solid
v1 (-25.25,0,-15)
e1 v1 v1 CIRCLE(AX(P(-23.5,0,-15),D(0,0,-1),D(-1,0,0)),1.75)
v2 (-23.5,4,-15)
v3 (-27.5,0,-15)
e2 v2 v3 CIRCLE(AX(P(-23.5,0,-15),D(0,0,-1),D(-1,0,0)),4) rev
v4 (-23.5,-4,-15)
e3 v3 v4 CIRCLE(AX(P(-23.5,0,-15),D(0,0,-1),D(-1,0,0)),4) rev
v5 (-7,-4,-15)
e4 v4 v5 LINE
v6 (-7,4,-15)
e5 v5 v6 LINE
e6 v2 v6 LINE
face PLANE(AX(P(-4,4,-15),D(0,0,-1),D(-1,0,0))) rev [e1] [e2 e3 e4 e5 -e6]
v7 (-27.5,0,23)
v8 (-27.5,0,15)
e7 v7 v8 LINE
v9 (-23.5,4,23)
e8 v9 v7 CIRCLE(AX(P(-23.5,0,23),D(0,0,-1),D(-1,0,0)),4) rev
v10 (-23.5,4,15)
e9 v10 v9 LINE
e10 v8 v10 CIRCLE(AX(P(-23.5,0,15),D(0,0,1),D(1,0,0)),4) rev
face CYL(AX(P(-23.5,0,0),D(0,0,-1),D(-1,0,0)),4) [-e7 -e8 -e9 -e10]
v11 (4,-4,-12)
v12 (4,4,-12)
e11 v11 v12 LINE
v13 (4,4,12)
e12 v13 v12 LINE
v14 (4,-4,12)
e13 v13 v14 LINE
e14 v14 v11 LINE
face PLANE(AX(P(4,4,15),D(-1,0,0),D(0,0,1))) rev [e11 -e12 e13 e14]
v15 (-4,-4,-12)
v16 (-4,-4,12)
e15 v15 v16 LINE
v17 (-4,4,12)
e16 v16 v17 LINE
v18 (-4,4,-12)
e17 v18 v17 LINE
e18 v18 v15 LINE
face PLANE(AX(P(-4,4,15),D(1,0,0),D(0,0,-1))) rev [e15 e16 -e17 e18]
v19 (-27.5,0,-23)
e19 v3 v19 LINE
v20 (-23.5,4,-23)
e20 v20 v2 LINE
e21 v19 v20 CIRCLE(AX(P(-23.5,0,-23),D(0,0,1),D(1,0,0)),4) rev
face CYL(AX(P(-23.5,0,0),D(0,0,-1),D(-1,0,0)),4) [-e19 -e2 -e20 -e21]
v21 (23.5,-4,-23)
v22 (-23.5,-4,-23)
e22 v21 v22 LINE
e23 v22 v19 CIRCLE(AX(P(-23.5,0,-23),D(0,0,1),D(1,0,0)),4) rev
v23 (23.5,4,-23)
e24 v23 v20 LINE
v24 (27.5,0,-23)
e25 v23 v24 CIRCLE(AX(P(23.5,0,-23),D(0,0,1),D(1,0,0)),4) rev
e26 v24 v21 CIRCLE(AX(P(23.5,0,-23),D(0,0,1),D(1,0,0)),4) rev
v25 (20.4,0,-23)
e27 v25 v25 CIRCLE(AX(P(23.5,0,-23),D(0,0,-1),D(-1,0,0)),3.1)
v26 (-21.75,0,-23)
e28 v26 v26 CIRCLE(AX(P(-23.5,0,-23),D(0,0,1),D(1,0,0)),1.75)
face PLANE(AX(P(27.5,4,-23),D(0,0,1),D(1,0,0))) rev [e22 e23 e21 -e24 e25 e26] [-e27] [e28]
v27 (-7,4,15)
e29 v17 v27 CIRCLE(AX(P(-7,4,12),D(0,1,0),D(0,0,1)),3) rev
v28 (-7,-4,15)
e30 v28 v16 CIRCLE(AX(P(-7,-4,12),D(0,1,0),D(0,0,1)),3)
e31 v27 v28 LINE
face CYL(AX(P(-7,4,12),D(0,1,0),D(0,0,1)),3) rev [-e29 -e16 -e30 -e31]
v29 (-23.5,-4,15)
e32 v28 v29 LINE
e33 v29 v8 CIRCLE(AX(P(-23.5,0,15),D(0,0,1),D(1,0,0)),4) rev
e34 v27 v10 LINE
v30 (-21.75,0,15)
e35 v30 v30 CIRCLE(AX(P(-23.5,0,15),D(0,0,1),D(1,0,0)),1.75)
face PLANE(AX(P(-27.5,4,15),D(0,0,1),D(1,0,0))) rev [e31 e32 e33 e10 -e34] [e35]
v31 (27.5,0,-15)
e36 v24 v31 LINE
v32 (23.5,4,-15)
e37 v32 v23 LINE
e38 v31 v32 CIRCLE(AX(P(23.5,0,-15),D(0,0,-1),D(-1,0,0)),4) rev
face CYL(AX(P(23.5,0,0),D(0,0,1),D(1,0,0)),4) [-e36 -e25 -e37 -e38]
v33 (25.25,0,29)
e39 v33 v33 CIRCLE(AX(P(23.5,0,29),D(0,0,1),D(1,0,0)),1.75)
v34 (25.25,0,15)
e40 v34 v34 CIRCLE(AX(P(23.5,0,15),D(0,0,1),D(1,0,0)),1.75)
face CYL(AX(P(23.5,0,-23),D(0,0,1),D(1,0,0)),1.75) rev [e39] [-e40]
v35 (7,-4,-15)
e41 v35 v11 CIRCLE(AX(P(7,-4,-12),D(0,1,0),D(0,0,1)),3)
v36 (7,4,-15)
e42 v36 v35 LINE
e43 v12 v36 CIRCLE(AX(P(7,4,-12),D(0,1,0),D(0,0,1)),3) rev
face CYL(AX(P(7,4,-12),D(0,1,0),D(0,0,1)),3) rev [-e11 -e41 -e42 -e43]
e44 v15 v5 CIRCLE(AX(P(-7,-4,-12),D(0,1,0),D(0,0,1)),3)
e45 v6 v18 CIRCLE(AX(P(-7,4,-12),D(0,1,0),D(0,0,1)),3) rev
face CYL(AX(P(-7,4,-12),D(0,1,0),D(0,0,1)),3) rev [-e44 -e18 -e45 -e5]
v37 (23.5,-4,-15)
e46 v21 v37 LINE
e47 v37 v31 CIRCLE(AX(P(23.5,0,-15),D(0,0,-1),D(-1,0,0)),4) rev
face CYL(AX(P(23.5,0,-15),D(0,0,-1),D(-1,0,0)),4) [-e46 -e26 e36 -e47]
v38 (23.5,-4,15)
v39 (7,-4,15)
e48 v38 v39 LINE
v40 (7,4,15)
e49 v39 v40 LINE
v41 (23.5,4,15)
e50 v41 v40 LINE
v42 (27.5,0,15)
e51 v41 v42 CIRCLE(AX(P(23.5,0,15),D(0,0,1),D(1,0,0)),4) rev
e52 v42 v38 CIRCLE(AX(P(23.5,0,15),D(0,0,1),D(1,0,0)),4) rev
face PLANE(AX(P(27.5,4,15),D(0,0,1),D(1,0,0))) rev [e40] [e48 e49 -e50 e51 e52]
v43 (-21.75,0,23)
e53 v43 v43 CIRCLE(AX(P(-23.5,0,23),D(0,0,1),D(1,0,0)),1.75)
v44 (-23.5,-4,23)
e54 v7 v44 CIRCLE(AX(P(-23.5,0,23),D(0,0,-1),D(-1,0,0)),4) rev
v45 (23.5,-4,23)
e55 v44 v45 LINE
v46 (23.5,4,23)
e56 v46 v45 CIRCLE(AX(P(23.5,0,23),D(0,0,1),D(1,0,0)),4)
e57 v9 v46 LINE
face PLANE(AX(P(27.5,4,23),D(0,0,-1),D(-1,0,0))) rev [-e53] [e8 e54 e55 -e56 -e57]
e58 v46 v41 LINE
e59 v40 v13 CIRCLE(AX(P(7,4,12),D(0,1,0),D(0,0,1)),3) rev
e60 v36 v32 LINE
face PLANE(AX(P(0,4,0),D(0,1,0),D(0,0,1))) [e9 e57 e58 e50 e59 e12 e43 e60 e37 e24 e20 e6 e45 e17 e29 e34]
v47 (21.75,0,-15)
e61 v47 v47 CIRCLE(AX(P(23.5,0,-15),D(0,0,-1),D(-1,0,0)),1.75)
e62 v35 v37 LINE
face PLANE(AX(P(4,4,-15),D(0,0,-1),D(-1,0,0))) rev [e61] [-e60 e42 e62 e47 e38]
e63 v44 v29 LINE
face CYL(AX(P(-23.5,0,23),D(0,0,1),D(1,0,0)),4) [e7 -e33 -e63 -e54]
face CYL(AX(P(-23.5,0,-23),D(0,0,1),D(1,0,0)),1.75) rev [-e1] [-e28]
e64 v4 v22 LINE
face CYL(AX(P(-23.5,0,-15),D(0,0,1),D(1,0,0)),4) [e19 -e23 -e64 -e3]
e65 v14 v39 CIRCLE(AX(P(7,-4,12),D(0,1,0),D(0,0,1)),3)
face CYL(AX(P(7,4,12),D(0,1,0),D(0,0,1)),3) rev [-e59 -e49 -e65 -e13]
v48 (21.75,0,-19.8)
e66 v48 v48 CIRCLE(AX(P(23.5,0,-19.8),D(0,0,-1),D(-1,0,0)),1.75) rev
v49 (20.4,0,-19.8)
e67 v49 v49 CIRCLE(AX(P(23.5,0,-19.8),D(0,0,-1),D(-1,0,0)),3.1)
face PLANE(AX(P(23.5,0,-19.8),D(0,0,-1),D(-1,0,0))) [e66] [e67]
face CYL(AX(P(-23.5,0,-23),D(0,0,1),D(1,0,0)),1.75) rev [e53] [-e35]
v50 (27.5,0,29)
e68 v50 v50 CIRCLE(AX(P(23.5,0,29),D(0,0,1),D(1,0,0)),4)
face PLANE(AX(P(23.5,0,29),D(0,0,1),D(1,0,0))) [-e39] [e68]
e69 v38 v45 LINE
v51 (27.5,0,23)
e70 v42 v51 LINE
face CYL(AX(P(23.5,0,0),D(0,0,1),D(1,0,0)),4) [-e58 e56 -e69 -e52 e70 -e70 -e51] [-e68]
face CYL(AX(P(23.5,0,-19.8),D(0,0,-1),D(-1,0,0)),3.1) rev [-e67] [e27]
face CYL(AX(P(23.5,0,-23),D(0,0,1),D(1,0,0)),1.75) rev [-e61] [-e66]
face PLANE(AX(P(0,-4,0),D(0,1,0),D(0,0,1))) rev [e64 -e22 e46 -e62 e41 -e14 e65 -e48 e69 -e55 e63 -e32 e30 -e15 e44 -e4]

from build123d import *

# Parameters (mm, degrees)
SALIENTE_EXTRUIR1_DEPTH = 4
CROQUIS3_R              = 1.75
CORTAR_EXTRUIR1_DEPTH   = 54.742441329
REDONDEO8_R             = 4
REDONDEO9_R             = 3
SALIENTE_EXTRUIR2_START = 6
CROQUIS4_R              = 4
CROQUIS4_R_2            = 1.75
SALIENTE_EXTRUIR2_DEPTH = 6
CROQUIS5_R              = 3.1
CORTAR_EXTRUIR2_DEPTH   = 3.2


with BuildPart() as part:
    # Croquis2 → Saliente-Extruir1 (new, symmetric)
    with BuildSketch(Plane(origin=(0, 0, 0), x_dir=(1, 0, 0), z_dir=(0, 1, 0))):
        Polygon((27.5, -23), (27.5, -15), (4, -15), (4, 15), (27.5, 15), (27.5, 23), (-27.5, 23), (-27.5, 15), (-4, 15), (-4, -15), (-27.5, -15), (-27.5, -23), align=None)
    extrude(amount=SALIENTE_EXTRUIR1_DEPTH, both=True)

    # Croquis3 → Cortar-Extruir1 (cut, through all)
    with BuildSketch(Plane.XY.offset(23)):
        with Locations((23.5, 0)):
            Circle(CROQUIS3_R)
        with Locations((-23.5, 0)):
            Circle(CROQUIS3_R)
    extrude(amount=-CORTAR_EXTRUIR1_DEPTH, mode=Mode.SUBTRACT)

    # Redondeo8
    redondeo8_edges = [part.edges().sort_by_distance(p)[0] for p in [
        (27.5, -4, -19),
        (27.5, 4, -19),
        (27.5, -4, 19),
        (27.5, 4, 19),
        (-27.5, -4, -19),
        (-27.5, 4, -19),
        (-27.5, -4, 19),
        (-27.5, 4, 19),
    ]]
    fillet(redondeo8_edges, radius=REDONDEO8_R - 0.0001)  # a hair under: the kernel refuses the full size

    # Redondeo9
    redondeo9_edges = [part.edges().sort_by_distance(p)[0] for p in [
        (4, 0, -15),
        (4, 0, 15),
        (-4, 0, 15),
        (-4, 0, -15),
    ]]
    fillet(redondeo9_edges, radius=REDONDEO9_R)

    # Croquis4 → Saliente-Extruir2 (add)
    with BuildSketch(Plane.XY.offset(23).offset(SALIENTE_EXTRUIR2_START)):
        with Locations((23.5, 0)):
            Circle(CROQUIS4_R)
        with Locations((23.5, 0)):
            Circle(CROQUIS4_R_2, mode=Mode.SUBTRACT)
    extrude(amount=-SALIENTE_EXTRUIR2_DEPTH)

    # Croquis5 → Cortar-Extruir2 (cut)
    with BuildSketch(Plane(origin=(0, 0, -23), x_dir=(-1, 0, 0), z_dir=(0, 0, -1))):
        with Locations((-23.5, 0)):
            Circle(CROQUIS5_R)
    extrude(amount=-CORTAR_EXTRUIR2_DEPTH, mode=Mode.SUBTRACT)


solid = part.part
